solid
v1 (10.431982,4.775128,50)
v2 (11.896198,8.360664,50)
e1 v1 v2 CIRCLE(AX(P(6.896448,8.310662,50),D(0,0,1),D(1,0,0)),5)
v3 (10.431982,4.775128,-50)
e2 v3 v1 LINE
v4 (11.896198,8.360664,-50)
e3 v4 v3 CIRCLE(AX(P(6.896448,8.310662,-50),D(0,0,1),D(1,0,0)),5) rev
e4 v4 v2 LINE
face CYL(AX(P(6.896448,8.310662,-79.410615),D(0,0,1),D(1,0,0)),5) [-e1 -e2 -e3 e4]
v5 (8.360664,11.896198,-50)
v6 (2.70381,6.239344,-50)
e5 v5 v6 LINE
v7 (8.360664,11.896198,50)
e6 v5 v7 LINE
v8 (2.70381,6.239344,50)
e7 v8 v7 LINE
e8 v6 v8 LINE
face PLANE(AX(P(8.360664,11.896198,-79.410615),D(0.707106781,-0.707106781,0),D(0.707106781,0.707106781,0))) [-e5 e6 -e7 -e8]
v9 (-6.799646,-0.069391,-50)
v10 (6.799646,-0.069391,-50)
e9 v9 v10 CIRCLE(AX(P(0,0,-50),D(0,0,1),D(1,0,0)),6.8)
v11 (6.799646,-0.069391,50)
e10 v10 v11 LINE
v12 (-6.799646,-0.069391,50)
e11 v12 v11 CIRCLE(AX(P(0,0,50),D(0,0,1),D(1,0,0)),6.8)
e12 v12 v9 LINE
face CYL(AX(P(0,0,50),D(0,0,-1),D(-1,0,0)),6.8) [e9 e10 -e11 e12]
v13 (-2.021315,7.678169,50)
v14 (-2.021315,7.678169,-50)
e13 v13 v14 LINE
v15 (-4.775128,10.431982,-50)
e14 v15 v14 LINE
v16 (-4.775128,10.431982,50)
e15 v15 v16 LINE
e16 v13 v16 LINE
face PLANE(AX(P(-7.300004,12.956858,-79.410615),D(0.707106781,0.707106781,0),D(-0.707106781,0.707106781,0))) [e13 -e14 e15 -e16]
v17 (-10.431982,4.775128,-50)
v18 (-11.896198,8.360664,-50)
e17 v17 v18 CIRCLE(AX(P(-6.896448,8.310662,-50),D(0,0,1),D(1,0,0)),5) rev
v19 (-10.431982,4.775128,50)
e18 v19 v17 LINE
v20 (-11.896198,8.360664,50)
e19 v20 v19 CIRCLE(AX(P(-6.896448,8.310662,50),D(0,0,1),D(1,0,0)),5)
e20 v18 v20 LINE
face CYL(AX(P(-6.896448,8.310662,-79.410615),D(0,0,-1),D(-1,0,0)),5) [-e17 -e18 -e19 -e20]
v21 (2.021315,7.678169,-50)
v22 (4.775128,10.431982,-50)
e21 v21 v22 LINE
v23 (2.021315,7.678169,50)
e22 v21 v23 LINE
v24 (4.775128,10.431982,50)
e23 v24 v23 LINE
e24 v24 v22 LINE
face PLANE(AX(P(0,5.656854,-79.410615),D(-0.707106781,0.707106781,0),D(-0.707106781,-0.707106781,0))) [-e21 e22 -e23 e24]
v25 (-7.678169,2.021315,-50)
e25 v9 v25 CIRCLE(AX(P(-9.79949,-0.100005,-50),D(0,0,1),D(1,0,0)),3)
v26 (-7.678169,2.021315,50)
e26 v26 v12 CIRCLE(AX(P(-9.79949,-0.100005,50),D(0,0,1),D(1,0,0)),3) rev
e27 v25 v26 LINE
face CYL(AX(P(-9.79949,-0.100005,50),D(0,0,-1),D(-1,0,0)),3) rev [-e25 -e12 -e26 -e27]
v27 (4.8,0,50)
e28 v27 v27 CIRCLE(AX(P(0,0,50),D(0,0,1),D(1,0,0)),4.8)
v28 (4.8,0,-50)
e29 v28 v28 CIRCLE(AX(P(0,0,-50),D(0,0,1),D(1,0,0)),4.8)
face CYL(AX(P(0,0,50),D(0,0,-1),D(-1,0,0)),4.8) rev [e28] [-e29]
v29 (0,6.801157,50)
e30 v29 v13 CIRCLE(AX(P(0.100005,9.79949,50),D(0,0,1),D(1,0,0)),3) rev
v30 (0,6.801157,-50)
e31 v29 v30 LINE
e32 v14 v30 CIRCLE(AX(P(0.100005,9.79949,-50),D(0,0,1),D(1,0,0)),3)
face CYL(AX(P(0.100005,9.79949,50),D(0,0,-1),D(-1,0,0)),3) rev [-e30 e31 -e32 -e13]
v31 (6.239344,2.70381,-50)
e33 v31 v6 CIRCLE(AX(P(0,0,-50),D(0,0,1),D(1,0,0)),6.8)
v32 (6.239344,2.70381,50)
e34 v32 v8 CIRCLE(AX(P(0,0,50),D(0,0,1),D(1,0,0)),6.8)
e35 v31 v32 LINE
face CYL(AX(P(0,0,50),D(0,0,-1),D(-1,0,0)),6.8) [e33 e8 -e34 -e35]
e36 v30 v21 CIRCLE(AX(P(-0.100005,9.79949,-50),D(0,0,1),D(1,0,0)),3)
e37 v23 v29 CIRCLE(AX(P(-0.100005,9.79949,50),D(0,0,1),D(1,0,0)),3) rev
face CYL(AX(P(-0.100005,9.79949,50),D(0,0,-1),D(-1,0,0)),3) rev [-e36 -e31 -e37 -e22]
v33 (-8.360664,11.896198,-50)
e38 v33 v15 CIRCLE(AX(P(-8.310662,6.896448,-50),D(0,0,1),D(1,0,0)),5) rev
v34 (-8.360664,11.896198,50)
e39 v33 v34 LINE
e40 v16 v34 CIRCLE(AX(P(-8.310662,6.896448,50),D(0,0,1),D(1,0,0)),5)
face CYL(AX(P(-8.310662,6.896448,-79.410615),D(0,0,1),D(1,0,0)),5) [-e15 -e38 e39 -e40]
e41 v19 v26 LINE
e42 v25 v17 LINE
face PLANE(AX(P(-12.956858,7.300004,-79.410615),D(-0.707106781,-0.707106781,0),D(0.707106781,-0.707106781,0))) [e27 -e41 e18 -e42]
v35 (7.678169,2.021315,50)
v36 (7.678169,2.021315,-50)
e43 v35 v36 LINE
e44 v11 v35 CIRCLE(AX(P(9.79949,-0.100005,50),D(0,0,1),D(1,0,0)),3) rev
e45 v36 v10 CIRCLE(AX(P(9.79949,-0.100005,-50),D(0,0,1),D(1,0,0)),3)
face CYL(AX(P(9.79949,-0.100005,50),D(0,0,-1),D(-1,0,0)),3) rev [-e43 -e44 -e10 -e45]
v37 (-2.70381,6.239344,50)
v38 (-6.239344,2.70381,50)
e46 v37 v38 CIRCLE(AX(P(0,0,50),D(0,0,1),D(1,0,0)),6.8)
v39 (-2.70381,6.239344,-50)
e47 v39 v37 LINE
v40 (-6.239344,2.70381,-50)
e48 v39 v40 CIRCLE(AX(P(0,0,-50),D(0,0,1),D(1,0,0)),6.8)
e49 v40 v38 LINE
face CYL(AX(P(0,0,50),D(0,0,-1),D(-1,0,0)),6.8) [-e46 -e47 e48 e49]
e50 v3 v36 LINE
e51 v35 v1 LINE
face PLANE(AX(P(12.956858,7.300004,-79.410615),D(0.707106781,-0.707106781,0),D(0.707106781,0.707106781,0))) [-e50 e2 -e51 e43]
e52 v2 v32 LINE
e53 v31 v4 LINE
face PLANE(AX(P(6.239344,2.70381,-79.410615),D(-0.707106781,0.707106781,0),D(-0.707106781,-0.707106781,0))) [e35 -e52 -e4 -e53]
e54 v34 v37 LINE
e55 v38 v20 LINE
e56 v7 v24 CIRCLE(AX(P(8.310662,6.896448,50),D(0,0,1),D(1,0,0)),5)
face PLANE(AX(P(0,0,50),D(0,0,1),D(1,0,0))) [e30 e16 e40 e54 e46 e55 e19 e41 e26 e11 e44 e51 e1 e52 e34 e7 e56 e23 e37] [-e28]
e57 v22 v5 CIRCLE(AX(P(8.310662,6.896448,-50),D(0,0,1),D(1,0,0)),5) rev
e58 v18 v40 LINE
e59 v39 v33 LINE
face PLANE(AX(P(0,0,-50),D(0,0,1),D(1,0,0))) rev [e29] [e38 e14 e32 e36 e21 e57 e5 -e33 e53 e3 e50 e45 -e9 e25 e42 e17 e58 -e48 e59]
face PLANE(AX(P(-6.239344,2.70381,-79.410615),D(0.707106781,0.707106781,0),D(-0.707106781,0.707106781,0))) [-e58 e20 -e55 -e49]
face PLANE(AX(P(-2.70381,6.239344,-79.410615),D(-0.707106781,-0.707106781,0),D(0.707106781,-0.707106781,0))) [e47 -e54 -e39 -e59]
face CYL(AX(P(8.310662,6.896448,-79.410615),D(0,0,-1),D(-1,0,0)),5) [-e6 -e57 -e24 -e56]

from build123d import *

# Parameters (mm, degrees)
SKETCH1_R                   = 6.8
SKETCH1_R_2                 = 4.8
TUBE_SURROUNDING_DEPTH      = 50
FIN_START                   = -100
FIN_HOLDERS_DEPTH           = 100
F_3MM_SUPPORT_FILLETS_R     = 3
F_5MM_FIN_HOLDER_ROUNDING_R = 5


with BuildPart() as part:
    # Sketch1 → Tube surrounding (new, symmetric)
    with BuildSketch(Plane.XY):
        Circle(SKETCH1_R)
        Circle(SKETCH1_R_2, mode=Mode.SUBTRACT)
    extrude(amount=TUBE_SURROUNDING_DEPTH, both=True)

    # Sketch2 → Fin holders (add)
    with BuildSketch(Plane.XY.offset(50).offset(FIN_START)):
        with BuildLine():
            Line((-6.239343856, 2.70380995), (-2.70380995, 6.239343856))
            Line((-2.70380995, 6.239343856), (-8.3606642, 11.896198106))
            Line((-8.3606642, 11.896198106), (-7.300004028, 12.956858277))
            Line((-7.300004028, 12.956858277), (0, 5.656854249))
            Line((0, 5.656854249), (7.300004028, 12.956858277))
            Line((7.300004028, 12.956858277), (8.3606642, 11.896198106))
            Line((8.3606642, 11.896198106), (2.70380995, 6.239343856))
            Line((2.70380995, 6.239343856), (6.239343856, 2.70380995))
            Line((6.239343856, 2.70380995), (11.896198106, 8.3606642))
            Line((11.896198106, 8.3606642), (12.956858277, 7.300004028))
            Line((12.956858277, 7.300004028), (4.704593429, -0.952260821))
            ThreePointArc((4.704593429, -0.952260821), (0, 4.8), (-4.704593429, -0.952260821))
            Line((-4.704593429, -0.952260821), (-12.956858277, 7.300004028))
            Line((-12.956858277, 7.300004028), (-11.896198106, 8.3606642))
            Line((-11.896198106, 8.3606642), (-6.239343856, 2.70380995))
        make_face()
    extrude(amount=FIN_HOLDERS_DEPTH)

    # 3mm support fillets
    # the kernel refuses this fillet: 3 mm, written as the material it adds along each edge
    with BuildSketch(Plane(origin=(1.060017294, 6.716871544, -50), x_dir=(-0.9973250573829818, 0.07309398002593596, 0), z_dir=(0, 0, 1)), Plane(origin=(-6.716871544, 1.060017294, -50), x_dir=(-0.07309398002594036, -0.9973250573829815, 0), z_dir=(0, 0, 1))) as f_3mm_support_fillets_piece_1:
        with BuildLine():
            CenterArc((1.38224034, -2.989581697), F_3MM_SUPPORT_FILLETS_R, 94.776406165, 44.415308597)
            Line((-0.88846134, -1.028991511), (0, 0))
            ThreePointArc((0, 0), (0.566218934, -0.023614819), (1.132437869, 0))
        make_face()
    extrude(amount=100)
    with BuildSketch(Plane(origin=(-1.060017294, 6.716871544, -50), x_dir=(-0.7071067811865461, 0.707106781186549, 0), z_dir=(0, 0, 1)), Plane(origin=(6.716871544, 1.060017294, -50), x_dir=(0.7071067811865486, 0.7071067811865466, 0), z_dir=(0, 0, 1))) as f_3mm_support_fillets_piece_2:
        with BuildLine():
            CenterArc((1.359480446, -3), F_3MM_SUPPORT_FILLETS_R, 90, 44.415308597)
            ThreePointArc((-0.740082191, -0.857142857), (-0.352167026, -0.444004423), (0, 0))
            Line((0, 0), (1.359480446, 0))
        make_face()
    extrude(amount=100)

    # 5mm fin holder rounding
    # the kernel refuses this fillet: 5 mm, written as the material it takes off along each edge
    with BuildSketch(Plane(origin=(12.956858277, 7.300004028, -58.926785536), x_dir=(-0.707106781186548, -0.7071067811865471, 0), z_dir=(0, 0, 1)), Plane(origin=(-7.300004028, 12.956858277, -58.926785536), x_dir=(0.7071067811865471, -0.707106781186548, 0), z_dir=(0, 0, 1))) as f_5mm_fin_holder_rounding_piece_1:
        with BuildLine():
            CenterArc((3.570714214, -5), F_5MM_FIN_HOLDER_ROUNDING_R, 90, 45.572995999)
            Line((0, -1.5), (-0.071414284, -1.43))
            ThreePointArc((-0.071414284, -1.43), (-0.1, -0.75), (-0.1, 0))
            Line((-0.1, 0), (0, 0.1))
            Line((0, 0.1), (3.570714214, 0.1))
            Line((3.570714214, 0.1), (3.570714214, 0))
        make_face()
    extrude(amount=117.853571071, mode=Mode.SUBTRACT)
    with BuildSketch(Plane(origin=(-12.956858277, 7.300004028, -58.926785536), x_dir=(0.7071067811865476, 0.7071067811865476, 0), z_dir=(0, 0, 1))) as f_5mm_fin_holder_rounding_piece_2:
        with BuildLine():
            CenterArc((5, -3.570714214), F_5MM_FIN_HOLDER_ROUNDING_R, 134.427004001, 45.572995999)
            Line((0, -3.570714214), (-0.1, -3.570714214))
            Line((-0.1, -3.570714214), (-0.1, 0))
            Line((-0.1, 0), (0, 0.1))
            ThreePointArc((0, 0.1), (0.75, 0.1), (1.43, 0.071414284))
            Line((1.43, 0.071414284), (1.5, 0))
        make_face()
    extrude(amount=117.853571071, mode=Mode.SUBTRACT)
    with BuildSketch(Plane(origin=(7.300004028, 12.956858277, -58.926785536), x_dir=(-0.707106781186548, -0.707106781186547, 0), z_dir=(0, 0, 1))) as f_5mm_fin_holder_rounding_piece_3:
        with BuildLine():
            CenterArc((3.570714214, 5), F_5MM_FIN_HOLDER_ROUNDING_R, 224.427004001, 45.572995999)
            Line((0, 1.5), (-0.071414284, 1.43))
            ThreePointArc((-0.071414284, 1.43), (-0.1, 0.75), (-0.1, 0))
            Line((-0.1, 0), (0, -0.1))
            Line((0, -0.1), (3.570714214, -0.1))
            Line((3.570714214, -0.1), (3.570714214, 0))
        make_face()
    extrude(amount=117.853571071, mode=Mode.SUBTRACT)


solid = part.part
